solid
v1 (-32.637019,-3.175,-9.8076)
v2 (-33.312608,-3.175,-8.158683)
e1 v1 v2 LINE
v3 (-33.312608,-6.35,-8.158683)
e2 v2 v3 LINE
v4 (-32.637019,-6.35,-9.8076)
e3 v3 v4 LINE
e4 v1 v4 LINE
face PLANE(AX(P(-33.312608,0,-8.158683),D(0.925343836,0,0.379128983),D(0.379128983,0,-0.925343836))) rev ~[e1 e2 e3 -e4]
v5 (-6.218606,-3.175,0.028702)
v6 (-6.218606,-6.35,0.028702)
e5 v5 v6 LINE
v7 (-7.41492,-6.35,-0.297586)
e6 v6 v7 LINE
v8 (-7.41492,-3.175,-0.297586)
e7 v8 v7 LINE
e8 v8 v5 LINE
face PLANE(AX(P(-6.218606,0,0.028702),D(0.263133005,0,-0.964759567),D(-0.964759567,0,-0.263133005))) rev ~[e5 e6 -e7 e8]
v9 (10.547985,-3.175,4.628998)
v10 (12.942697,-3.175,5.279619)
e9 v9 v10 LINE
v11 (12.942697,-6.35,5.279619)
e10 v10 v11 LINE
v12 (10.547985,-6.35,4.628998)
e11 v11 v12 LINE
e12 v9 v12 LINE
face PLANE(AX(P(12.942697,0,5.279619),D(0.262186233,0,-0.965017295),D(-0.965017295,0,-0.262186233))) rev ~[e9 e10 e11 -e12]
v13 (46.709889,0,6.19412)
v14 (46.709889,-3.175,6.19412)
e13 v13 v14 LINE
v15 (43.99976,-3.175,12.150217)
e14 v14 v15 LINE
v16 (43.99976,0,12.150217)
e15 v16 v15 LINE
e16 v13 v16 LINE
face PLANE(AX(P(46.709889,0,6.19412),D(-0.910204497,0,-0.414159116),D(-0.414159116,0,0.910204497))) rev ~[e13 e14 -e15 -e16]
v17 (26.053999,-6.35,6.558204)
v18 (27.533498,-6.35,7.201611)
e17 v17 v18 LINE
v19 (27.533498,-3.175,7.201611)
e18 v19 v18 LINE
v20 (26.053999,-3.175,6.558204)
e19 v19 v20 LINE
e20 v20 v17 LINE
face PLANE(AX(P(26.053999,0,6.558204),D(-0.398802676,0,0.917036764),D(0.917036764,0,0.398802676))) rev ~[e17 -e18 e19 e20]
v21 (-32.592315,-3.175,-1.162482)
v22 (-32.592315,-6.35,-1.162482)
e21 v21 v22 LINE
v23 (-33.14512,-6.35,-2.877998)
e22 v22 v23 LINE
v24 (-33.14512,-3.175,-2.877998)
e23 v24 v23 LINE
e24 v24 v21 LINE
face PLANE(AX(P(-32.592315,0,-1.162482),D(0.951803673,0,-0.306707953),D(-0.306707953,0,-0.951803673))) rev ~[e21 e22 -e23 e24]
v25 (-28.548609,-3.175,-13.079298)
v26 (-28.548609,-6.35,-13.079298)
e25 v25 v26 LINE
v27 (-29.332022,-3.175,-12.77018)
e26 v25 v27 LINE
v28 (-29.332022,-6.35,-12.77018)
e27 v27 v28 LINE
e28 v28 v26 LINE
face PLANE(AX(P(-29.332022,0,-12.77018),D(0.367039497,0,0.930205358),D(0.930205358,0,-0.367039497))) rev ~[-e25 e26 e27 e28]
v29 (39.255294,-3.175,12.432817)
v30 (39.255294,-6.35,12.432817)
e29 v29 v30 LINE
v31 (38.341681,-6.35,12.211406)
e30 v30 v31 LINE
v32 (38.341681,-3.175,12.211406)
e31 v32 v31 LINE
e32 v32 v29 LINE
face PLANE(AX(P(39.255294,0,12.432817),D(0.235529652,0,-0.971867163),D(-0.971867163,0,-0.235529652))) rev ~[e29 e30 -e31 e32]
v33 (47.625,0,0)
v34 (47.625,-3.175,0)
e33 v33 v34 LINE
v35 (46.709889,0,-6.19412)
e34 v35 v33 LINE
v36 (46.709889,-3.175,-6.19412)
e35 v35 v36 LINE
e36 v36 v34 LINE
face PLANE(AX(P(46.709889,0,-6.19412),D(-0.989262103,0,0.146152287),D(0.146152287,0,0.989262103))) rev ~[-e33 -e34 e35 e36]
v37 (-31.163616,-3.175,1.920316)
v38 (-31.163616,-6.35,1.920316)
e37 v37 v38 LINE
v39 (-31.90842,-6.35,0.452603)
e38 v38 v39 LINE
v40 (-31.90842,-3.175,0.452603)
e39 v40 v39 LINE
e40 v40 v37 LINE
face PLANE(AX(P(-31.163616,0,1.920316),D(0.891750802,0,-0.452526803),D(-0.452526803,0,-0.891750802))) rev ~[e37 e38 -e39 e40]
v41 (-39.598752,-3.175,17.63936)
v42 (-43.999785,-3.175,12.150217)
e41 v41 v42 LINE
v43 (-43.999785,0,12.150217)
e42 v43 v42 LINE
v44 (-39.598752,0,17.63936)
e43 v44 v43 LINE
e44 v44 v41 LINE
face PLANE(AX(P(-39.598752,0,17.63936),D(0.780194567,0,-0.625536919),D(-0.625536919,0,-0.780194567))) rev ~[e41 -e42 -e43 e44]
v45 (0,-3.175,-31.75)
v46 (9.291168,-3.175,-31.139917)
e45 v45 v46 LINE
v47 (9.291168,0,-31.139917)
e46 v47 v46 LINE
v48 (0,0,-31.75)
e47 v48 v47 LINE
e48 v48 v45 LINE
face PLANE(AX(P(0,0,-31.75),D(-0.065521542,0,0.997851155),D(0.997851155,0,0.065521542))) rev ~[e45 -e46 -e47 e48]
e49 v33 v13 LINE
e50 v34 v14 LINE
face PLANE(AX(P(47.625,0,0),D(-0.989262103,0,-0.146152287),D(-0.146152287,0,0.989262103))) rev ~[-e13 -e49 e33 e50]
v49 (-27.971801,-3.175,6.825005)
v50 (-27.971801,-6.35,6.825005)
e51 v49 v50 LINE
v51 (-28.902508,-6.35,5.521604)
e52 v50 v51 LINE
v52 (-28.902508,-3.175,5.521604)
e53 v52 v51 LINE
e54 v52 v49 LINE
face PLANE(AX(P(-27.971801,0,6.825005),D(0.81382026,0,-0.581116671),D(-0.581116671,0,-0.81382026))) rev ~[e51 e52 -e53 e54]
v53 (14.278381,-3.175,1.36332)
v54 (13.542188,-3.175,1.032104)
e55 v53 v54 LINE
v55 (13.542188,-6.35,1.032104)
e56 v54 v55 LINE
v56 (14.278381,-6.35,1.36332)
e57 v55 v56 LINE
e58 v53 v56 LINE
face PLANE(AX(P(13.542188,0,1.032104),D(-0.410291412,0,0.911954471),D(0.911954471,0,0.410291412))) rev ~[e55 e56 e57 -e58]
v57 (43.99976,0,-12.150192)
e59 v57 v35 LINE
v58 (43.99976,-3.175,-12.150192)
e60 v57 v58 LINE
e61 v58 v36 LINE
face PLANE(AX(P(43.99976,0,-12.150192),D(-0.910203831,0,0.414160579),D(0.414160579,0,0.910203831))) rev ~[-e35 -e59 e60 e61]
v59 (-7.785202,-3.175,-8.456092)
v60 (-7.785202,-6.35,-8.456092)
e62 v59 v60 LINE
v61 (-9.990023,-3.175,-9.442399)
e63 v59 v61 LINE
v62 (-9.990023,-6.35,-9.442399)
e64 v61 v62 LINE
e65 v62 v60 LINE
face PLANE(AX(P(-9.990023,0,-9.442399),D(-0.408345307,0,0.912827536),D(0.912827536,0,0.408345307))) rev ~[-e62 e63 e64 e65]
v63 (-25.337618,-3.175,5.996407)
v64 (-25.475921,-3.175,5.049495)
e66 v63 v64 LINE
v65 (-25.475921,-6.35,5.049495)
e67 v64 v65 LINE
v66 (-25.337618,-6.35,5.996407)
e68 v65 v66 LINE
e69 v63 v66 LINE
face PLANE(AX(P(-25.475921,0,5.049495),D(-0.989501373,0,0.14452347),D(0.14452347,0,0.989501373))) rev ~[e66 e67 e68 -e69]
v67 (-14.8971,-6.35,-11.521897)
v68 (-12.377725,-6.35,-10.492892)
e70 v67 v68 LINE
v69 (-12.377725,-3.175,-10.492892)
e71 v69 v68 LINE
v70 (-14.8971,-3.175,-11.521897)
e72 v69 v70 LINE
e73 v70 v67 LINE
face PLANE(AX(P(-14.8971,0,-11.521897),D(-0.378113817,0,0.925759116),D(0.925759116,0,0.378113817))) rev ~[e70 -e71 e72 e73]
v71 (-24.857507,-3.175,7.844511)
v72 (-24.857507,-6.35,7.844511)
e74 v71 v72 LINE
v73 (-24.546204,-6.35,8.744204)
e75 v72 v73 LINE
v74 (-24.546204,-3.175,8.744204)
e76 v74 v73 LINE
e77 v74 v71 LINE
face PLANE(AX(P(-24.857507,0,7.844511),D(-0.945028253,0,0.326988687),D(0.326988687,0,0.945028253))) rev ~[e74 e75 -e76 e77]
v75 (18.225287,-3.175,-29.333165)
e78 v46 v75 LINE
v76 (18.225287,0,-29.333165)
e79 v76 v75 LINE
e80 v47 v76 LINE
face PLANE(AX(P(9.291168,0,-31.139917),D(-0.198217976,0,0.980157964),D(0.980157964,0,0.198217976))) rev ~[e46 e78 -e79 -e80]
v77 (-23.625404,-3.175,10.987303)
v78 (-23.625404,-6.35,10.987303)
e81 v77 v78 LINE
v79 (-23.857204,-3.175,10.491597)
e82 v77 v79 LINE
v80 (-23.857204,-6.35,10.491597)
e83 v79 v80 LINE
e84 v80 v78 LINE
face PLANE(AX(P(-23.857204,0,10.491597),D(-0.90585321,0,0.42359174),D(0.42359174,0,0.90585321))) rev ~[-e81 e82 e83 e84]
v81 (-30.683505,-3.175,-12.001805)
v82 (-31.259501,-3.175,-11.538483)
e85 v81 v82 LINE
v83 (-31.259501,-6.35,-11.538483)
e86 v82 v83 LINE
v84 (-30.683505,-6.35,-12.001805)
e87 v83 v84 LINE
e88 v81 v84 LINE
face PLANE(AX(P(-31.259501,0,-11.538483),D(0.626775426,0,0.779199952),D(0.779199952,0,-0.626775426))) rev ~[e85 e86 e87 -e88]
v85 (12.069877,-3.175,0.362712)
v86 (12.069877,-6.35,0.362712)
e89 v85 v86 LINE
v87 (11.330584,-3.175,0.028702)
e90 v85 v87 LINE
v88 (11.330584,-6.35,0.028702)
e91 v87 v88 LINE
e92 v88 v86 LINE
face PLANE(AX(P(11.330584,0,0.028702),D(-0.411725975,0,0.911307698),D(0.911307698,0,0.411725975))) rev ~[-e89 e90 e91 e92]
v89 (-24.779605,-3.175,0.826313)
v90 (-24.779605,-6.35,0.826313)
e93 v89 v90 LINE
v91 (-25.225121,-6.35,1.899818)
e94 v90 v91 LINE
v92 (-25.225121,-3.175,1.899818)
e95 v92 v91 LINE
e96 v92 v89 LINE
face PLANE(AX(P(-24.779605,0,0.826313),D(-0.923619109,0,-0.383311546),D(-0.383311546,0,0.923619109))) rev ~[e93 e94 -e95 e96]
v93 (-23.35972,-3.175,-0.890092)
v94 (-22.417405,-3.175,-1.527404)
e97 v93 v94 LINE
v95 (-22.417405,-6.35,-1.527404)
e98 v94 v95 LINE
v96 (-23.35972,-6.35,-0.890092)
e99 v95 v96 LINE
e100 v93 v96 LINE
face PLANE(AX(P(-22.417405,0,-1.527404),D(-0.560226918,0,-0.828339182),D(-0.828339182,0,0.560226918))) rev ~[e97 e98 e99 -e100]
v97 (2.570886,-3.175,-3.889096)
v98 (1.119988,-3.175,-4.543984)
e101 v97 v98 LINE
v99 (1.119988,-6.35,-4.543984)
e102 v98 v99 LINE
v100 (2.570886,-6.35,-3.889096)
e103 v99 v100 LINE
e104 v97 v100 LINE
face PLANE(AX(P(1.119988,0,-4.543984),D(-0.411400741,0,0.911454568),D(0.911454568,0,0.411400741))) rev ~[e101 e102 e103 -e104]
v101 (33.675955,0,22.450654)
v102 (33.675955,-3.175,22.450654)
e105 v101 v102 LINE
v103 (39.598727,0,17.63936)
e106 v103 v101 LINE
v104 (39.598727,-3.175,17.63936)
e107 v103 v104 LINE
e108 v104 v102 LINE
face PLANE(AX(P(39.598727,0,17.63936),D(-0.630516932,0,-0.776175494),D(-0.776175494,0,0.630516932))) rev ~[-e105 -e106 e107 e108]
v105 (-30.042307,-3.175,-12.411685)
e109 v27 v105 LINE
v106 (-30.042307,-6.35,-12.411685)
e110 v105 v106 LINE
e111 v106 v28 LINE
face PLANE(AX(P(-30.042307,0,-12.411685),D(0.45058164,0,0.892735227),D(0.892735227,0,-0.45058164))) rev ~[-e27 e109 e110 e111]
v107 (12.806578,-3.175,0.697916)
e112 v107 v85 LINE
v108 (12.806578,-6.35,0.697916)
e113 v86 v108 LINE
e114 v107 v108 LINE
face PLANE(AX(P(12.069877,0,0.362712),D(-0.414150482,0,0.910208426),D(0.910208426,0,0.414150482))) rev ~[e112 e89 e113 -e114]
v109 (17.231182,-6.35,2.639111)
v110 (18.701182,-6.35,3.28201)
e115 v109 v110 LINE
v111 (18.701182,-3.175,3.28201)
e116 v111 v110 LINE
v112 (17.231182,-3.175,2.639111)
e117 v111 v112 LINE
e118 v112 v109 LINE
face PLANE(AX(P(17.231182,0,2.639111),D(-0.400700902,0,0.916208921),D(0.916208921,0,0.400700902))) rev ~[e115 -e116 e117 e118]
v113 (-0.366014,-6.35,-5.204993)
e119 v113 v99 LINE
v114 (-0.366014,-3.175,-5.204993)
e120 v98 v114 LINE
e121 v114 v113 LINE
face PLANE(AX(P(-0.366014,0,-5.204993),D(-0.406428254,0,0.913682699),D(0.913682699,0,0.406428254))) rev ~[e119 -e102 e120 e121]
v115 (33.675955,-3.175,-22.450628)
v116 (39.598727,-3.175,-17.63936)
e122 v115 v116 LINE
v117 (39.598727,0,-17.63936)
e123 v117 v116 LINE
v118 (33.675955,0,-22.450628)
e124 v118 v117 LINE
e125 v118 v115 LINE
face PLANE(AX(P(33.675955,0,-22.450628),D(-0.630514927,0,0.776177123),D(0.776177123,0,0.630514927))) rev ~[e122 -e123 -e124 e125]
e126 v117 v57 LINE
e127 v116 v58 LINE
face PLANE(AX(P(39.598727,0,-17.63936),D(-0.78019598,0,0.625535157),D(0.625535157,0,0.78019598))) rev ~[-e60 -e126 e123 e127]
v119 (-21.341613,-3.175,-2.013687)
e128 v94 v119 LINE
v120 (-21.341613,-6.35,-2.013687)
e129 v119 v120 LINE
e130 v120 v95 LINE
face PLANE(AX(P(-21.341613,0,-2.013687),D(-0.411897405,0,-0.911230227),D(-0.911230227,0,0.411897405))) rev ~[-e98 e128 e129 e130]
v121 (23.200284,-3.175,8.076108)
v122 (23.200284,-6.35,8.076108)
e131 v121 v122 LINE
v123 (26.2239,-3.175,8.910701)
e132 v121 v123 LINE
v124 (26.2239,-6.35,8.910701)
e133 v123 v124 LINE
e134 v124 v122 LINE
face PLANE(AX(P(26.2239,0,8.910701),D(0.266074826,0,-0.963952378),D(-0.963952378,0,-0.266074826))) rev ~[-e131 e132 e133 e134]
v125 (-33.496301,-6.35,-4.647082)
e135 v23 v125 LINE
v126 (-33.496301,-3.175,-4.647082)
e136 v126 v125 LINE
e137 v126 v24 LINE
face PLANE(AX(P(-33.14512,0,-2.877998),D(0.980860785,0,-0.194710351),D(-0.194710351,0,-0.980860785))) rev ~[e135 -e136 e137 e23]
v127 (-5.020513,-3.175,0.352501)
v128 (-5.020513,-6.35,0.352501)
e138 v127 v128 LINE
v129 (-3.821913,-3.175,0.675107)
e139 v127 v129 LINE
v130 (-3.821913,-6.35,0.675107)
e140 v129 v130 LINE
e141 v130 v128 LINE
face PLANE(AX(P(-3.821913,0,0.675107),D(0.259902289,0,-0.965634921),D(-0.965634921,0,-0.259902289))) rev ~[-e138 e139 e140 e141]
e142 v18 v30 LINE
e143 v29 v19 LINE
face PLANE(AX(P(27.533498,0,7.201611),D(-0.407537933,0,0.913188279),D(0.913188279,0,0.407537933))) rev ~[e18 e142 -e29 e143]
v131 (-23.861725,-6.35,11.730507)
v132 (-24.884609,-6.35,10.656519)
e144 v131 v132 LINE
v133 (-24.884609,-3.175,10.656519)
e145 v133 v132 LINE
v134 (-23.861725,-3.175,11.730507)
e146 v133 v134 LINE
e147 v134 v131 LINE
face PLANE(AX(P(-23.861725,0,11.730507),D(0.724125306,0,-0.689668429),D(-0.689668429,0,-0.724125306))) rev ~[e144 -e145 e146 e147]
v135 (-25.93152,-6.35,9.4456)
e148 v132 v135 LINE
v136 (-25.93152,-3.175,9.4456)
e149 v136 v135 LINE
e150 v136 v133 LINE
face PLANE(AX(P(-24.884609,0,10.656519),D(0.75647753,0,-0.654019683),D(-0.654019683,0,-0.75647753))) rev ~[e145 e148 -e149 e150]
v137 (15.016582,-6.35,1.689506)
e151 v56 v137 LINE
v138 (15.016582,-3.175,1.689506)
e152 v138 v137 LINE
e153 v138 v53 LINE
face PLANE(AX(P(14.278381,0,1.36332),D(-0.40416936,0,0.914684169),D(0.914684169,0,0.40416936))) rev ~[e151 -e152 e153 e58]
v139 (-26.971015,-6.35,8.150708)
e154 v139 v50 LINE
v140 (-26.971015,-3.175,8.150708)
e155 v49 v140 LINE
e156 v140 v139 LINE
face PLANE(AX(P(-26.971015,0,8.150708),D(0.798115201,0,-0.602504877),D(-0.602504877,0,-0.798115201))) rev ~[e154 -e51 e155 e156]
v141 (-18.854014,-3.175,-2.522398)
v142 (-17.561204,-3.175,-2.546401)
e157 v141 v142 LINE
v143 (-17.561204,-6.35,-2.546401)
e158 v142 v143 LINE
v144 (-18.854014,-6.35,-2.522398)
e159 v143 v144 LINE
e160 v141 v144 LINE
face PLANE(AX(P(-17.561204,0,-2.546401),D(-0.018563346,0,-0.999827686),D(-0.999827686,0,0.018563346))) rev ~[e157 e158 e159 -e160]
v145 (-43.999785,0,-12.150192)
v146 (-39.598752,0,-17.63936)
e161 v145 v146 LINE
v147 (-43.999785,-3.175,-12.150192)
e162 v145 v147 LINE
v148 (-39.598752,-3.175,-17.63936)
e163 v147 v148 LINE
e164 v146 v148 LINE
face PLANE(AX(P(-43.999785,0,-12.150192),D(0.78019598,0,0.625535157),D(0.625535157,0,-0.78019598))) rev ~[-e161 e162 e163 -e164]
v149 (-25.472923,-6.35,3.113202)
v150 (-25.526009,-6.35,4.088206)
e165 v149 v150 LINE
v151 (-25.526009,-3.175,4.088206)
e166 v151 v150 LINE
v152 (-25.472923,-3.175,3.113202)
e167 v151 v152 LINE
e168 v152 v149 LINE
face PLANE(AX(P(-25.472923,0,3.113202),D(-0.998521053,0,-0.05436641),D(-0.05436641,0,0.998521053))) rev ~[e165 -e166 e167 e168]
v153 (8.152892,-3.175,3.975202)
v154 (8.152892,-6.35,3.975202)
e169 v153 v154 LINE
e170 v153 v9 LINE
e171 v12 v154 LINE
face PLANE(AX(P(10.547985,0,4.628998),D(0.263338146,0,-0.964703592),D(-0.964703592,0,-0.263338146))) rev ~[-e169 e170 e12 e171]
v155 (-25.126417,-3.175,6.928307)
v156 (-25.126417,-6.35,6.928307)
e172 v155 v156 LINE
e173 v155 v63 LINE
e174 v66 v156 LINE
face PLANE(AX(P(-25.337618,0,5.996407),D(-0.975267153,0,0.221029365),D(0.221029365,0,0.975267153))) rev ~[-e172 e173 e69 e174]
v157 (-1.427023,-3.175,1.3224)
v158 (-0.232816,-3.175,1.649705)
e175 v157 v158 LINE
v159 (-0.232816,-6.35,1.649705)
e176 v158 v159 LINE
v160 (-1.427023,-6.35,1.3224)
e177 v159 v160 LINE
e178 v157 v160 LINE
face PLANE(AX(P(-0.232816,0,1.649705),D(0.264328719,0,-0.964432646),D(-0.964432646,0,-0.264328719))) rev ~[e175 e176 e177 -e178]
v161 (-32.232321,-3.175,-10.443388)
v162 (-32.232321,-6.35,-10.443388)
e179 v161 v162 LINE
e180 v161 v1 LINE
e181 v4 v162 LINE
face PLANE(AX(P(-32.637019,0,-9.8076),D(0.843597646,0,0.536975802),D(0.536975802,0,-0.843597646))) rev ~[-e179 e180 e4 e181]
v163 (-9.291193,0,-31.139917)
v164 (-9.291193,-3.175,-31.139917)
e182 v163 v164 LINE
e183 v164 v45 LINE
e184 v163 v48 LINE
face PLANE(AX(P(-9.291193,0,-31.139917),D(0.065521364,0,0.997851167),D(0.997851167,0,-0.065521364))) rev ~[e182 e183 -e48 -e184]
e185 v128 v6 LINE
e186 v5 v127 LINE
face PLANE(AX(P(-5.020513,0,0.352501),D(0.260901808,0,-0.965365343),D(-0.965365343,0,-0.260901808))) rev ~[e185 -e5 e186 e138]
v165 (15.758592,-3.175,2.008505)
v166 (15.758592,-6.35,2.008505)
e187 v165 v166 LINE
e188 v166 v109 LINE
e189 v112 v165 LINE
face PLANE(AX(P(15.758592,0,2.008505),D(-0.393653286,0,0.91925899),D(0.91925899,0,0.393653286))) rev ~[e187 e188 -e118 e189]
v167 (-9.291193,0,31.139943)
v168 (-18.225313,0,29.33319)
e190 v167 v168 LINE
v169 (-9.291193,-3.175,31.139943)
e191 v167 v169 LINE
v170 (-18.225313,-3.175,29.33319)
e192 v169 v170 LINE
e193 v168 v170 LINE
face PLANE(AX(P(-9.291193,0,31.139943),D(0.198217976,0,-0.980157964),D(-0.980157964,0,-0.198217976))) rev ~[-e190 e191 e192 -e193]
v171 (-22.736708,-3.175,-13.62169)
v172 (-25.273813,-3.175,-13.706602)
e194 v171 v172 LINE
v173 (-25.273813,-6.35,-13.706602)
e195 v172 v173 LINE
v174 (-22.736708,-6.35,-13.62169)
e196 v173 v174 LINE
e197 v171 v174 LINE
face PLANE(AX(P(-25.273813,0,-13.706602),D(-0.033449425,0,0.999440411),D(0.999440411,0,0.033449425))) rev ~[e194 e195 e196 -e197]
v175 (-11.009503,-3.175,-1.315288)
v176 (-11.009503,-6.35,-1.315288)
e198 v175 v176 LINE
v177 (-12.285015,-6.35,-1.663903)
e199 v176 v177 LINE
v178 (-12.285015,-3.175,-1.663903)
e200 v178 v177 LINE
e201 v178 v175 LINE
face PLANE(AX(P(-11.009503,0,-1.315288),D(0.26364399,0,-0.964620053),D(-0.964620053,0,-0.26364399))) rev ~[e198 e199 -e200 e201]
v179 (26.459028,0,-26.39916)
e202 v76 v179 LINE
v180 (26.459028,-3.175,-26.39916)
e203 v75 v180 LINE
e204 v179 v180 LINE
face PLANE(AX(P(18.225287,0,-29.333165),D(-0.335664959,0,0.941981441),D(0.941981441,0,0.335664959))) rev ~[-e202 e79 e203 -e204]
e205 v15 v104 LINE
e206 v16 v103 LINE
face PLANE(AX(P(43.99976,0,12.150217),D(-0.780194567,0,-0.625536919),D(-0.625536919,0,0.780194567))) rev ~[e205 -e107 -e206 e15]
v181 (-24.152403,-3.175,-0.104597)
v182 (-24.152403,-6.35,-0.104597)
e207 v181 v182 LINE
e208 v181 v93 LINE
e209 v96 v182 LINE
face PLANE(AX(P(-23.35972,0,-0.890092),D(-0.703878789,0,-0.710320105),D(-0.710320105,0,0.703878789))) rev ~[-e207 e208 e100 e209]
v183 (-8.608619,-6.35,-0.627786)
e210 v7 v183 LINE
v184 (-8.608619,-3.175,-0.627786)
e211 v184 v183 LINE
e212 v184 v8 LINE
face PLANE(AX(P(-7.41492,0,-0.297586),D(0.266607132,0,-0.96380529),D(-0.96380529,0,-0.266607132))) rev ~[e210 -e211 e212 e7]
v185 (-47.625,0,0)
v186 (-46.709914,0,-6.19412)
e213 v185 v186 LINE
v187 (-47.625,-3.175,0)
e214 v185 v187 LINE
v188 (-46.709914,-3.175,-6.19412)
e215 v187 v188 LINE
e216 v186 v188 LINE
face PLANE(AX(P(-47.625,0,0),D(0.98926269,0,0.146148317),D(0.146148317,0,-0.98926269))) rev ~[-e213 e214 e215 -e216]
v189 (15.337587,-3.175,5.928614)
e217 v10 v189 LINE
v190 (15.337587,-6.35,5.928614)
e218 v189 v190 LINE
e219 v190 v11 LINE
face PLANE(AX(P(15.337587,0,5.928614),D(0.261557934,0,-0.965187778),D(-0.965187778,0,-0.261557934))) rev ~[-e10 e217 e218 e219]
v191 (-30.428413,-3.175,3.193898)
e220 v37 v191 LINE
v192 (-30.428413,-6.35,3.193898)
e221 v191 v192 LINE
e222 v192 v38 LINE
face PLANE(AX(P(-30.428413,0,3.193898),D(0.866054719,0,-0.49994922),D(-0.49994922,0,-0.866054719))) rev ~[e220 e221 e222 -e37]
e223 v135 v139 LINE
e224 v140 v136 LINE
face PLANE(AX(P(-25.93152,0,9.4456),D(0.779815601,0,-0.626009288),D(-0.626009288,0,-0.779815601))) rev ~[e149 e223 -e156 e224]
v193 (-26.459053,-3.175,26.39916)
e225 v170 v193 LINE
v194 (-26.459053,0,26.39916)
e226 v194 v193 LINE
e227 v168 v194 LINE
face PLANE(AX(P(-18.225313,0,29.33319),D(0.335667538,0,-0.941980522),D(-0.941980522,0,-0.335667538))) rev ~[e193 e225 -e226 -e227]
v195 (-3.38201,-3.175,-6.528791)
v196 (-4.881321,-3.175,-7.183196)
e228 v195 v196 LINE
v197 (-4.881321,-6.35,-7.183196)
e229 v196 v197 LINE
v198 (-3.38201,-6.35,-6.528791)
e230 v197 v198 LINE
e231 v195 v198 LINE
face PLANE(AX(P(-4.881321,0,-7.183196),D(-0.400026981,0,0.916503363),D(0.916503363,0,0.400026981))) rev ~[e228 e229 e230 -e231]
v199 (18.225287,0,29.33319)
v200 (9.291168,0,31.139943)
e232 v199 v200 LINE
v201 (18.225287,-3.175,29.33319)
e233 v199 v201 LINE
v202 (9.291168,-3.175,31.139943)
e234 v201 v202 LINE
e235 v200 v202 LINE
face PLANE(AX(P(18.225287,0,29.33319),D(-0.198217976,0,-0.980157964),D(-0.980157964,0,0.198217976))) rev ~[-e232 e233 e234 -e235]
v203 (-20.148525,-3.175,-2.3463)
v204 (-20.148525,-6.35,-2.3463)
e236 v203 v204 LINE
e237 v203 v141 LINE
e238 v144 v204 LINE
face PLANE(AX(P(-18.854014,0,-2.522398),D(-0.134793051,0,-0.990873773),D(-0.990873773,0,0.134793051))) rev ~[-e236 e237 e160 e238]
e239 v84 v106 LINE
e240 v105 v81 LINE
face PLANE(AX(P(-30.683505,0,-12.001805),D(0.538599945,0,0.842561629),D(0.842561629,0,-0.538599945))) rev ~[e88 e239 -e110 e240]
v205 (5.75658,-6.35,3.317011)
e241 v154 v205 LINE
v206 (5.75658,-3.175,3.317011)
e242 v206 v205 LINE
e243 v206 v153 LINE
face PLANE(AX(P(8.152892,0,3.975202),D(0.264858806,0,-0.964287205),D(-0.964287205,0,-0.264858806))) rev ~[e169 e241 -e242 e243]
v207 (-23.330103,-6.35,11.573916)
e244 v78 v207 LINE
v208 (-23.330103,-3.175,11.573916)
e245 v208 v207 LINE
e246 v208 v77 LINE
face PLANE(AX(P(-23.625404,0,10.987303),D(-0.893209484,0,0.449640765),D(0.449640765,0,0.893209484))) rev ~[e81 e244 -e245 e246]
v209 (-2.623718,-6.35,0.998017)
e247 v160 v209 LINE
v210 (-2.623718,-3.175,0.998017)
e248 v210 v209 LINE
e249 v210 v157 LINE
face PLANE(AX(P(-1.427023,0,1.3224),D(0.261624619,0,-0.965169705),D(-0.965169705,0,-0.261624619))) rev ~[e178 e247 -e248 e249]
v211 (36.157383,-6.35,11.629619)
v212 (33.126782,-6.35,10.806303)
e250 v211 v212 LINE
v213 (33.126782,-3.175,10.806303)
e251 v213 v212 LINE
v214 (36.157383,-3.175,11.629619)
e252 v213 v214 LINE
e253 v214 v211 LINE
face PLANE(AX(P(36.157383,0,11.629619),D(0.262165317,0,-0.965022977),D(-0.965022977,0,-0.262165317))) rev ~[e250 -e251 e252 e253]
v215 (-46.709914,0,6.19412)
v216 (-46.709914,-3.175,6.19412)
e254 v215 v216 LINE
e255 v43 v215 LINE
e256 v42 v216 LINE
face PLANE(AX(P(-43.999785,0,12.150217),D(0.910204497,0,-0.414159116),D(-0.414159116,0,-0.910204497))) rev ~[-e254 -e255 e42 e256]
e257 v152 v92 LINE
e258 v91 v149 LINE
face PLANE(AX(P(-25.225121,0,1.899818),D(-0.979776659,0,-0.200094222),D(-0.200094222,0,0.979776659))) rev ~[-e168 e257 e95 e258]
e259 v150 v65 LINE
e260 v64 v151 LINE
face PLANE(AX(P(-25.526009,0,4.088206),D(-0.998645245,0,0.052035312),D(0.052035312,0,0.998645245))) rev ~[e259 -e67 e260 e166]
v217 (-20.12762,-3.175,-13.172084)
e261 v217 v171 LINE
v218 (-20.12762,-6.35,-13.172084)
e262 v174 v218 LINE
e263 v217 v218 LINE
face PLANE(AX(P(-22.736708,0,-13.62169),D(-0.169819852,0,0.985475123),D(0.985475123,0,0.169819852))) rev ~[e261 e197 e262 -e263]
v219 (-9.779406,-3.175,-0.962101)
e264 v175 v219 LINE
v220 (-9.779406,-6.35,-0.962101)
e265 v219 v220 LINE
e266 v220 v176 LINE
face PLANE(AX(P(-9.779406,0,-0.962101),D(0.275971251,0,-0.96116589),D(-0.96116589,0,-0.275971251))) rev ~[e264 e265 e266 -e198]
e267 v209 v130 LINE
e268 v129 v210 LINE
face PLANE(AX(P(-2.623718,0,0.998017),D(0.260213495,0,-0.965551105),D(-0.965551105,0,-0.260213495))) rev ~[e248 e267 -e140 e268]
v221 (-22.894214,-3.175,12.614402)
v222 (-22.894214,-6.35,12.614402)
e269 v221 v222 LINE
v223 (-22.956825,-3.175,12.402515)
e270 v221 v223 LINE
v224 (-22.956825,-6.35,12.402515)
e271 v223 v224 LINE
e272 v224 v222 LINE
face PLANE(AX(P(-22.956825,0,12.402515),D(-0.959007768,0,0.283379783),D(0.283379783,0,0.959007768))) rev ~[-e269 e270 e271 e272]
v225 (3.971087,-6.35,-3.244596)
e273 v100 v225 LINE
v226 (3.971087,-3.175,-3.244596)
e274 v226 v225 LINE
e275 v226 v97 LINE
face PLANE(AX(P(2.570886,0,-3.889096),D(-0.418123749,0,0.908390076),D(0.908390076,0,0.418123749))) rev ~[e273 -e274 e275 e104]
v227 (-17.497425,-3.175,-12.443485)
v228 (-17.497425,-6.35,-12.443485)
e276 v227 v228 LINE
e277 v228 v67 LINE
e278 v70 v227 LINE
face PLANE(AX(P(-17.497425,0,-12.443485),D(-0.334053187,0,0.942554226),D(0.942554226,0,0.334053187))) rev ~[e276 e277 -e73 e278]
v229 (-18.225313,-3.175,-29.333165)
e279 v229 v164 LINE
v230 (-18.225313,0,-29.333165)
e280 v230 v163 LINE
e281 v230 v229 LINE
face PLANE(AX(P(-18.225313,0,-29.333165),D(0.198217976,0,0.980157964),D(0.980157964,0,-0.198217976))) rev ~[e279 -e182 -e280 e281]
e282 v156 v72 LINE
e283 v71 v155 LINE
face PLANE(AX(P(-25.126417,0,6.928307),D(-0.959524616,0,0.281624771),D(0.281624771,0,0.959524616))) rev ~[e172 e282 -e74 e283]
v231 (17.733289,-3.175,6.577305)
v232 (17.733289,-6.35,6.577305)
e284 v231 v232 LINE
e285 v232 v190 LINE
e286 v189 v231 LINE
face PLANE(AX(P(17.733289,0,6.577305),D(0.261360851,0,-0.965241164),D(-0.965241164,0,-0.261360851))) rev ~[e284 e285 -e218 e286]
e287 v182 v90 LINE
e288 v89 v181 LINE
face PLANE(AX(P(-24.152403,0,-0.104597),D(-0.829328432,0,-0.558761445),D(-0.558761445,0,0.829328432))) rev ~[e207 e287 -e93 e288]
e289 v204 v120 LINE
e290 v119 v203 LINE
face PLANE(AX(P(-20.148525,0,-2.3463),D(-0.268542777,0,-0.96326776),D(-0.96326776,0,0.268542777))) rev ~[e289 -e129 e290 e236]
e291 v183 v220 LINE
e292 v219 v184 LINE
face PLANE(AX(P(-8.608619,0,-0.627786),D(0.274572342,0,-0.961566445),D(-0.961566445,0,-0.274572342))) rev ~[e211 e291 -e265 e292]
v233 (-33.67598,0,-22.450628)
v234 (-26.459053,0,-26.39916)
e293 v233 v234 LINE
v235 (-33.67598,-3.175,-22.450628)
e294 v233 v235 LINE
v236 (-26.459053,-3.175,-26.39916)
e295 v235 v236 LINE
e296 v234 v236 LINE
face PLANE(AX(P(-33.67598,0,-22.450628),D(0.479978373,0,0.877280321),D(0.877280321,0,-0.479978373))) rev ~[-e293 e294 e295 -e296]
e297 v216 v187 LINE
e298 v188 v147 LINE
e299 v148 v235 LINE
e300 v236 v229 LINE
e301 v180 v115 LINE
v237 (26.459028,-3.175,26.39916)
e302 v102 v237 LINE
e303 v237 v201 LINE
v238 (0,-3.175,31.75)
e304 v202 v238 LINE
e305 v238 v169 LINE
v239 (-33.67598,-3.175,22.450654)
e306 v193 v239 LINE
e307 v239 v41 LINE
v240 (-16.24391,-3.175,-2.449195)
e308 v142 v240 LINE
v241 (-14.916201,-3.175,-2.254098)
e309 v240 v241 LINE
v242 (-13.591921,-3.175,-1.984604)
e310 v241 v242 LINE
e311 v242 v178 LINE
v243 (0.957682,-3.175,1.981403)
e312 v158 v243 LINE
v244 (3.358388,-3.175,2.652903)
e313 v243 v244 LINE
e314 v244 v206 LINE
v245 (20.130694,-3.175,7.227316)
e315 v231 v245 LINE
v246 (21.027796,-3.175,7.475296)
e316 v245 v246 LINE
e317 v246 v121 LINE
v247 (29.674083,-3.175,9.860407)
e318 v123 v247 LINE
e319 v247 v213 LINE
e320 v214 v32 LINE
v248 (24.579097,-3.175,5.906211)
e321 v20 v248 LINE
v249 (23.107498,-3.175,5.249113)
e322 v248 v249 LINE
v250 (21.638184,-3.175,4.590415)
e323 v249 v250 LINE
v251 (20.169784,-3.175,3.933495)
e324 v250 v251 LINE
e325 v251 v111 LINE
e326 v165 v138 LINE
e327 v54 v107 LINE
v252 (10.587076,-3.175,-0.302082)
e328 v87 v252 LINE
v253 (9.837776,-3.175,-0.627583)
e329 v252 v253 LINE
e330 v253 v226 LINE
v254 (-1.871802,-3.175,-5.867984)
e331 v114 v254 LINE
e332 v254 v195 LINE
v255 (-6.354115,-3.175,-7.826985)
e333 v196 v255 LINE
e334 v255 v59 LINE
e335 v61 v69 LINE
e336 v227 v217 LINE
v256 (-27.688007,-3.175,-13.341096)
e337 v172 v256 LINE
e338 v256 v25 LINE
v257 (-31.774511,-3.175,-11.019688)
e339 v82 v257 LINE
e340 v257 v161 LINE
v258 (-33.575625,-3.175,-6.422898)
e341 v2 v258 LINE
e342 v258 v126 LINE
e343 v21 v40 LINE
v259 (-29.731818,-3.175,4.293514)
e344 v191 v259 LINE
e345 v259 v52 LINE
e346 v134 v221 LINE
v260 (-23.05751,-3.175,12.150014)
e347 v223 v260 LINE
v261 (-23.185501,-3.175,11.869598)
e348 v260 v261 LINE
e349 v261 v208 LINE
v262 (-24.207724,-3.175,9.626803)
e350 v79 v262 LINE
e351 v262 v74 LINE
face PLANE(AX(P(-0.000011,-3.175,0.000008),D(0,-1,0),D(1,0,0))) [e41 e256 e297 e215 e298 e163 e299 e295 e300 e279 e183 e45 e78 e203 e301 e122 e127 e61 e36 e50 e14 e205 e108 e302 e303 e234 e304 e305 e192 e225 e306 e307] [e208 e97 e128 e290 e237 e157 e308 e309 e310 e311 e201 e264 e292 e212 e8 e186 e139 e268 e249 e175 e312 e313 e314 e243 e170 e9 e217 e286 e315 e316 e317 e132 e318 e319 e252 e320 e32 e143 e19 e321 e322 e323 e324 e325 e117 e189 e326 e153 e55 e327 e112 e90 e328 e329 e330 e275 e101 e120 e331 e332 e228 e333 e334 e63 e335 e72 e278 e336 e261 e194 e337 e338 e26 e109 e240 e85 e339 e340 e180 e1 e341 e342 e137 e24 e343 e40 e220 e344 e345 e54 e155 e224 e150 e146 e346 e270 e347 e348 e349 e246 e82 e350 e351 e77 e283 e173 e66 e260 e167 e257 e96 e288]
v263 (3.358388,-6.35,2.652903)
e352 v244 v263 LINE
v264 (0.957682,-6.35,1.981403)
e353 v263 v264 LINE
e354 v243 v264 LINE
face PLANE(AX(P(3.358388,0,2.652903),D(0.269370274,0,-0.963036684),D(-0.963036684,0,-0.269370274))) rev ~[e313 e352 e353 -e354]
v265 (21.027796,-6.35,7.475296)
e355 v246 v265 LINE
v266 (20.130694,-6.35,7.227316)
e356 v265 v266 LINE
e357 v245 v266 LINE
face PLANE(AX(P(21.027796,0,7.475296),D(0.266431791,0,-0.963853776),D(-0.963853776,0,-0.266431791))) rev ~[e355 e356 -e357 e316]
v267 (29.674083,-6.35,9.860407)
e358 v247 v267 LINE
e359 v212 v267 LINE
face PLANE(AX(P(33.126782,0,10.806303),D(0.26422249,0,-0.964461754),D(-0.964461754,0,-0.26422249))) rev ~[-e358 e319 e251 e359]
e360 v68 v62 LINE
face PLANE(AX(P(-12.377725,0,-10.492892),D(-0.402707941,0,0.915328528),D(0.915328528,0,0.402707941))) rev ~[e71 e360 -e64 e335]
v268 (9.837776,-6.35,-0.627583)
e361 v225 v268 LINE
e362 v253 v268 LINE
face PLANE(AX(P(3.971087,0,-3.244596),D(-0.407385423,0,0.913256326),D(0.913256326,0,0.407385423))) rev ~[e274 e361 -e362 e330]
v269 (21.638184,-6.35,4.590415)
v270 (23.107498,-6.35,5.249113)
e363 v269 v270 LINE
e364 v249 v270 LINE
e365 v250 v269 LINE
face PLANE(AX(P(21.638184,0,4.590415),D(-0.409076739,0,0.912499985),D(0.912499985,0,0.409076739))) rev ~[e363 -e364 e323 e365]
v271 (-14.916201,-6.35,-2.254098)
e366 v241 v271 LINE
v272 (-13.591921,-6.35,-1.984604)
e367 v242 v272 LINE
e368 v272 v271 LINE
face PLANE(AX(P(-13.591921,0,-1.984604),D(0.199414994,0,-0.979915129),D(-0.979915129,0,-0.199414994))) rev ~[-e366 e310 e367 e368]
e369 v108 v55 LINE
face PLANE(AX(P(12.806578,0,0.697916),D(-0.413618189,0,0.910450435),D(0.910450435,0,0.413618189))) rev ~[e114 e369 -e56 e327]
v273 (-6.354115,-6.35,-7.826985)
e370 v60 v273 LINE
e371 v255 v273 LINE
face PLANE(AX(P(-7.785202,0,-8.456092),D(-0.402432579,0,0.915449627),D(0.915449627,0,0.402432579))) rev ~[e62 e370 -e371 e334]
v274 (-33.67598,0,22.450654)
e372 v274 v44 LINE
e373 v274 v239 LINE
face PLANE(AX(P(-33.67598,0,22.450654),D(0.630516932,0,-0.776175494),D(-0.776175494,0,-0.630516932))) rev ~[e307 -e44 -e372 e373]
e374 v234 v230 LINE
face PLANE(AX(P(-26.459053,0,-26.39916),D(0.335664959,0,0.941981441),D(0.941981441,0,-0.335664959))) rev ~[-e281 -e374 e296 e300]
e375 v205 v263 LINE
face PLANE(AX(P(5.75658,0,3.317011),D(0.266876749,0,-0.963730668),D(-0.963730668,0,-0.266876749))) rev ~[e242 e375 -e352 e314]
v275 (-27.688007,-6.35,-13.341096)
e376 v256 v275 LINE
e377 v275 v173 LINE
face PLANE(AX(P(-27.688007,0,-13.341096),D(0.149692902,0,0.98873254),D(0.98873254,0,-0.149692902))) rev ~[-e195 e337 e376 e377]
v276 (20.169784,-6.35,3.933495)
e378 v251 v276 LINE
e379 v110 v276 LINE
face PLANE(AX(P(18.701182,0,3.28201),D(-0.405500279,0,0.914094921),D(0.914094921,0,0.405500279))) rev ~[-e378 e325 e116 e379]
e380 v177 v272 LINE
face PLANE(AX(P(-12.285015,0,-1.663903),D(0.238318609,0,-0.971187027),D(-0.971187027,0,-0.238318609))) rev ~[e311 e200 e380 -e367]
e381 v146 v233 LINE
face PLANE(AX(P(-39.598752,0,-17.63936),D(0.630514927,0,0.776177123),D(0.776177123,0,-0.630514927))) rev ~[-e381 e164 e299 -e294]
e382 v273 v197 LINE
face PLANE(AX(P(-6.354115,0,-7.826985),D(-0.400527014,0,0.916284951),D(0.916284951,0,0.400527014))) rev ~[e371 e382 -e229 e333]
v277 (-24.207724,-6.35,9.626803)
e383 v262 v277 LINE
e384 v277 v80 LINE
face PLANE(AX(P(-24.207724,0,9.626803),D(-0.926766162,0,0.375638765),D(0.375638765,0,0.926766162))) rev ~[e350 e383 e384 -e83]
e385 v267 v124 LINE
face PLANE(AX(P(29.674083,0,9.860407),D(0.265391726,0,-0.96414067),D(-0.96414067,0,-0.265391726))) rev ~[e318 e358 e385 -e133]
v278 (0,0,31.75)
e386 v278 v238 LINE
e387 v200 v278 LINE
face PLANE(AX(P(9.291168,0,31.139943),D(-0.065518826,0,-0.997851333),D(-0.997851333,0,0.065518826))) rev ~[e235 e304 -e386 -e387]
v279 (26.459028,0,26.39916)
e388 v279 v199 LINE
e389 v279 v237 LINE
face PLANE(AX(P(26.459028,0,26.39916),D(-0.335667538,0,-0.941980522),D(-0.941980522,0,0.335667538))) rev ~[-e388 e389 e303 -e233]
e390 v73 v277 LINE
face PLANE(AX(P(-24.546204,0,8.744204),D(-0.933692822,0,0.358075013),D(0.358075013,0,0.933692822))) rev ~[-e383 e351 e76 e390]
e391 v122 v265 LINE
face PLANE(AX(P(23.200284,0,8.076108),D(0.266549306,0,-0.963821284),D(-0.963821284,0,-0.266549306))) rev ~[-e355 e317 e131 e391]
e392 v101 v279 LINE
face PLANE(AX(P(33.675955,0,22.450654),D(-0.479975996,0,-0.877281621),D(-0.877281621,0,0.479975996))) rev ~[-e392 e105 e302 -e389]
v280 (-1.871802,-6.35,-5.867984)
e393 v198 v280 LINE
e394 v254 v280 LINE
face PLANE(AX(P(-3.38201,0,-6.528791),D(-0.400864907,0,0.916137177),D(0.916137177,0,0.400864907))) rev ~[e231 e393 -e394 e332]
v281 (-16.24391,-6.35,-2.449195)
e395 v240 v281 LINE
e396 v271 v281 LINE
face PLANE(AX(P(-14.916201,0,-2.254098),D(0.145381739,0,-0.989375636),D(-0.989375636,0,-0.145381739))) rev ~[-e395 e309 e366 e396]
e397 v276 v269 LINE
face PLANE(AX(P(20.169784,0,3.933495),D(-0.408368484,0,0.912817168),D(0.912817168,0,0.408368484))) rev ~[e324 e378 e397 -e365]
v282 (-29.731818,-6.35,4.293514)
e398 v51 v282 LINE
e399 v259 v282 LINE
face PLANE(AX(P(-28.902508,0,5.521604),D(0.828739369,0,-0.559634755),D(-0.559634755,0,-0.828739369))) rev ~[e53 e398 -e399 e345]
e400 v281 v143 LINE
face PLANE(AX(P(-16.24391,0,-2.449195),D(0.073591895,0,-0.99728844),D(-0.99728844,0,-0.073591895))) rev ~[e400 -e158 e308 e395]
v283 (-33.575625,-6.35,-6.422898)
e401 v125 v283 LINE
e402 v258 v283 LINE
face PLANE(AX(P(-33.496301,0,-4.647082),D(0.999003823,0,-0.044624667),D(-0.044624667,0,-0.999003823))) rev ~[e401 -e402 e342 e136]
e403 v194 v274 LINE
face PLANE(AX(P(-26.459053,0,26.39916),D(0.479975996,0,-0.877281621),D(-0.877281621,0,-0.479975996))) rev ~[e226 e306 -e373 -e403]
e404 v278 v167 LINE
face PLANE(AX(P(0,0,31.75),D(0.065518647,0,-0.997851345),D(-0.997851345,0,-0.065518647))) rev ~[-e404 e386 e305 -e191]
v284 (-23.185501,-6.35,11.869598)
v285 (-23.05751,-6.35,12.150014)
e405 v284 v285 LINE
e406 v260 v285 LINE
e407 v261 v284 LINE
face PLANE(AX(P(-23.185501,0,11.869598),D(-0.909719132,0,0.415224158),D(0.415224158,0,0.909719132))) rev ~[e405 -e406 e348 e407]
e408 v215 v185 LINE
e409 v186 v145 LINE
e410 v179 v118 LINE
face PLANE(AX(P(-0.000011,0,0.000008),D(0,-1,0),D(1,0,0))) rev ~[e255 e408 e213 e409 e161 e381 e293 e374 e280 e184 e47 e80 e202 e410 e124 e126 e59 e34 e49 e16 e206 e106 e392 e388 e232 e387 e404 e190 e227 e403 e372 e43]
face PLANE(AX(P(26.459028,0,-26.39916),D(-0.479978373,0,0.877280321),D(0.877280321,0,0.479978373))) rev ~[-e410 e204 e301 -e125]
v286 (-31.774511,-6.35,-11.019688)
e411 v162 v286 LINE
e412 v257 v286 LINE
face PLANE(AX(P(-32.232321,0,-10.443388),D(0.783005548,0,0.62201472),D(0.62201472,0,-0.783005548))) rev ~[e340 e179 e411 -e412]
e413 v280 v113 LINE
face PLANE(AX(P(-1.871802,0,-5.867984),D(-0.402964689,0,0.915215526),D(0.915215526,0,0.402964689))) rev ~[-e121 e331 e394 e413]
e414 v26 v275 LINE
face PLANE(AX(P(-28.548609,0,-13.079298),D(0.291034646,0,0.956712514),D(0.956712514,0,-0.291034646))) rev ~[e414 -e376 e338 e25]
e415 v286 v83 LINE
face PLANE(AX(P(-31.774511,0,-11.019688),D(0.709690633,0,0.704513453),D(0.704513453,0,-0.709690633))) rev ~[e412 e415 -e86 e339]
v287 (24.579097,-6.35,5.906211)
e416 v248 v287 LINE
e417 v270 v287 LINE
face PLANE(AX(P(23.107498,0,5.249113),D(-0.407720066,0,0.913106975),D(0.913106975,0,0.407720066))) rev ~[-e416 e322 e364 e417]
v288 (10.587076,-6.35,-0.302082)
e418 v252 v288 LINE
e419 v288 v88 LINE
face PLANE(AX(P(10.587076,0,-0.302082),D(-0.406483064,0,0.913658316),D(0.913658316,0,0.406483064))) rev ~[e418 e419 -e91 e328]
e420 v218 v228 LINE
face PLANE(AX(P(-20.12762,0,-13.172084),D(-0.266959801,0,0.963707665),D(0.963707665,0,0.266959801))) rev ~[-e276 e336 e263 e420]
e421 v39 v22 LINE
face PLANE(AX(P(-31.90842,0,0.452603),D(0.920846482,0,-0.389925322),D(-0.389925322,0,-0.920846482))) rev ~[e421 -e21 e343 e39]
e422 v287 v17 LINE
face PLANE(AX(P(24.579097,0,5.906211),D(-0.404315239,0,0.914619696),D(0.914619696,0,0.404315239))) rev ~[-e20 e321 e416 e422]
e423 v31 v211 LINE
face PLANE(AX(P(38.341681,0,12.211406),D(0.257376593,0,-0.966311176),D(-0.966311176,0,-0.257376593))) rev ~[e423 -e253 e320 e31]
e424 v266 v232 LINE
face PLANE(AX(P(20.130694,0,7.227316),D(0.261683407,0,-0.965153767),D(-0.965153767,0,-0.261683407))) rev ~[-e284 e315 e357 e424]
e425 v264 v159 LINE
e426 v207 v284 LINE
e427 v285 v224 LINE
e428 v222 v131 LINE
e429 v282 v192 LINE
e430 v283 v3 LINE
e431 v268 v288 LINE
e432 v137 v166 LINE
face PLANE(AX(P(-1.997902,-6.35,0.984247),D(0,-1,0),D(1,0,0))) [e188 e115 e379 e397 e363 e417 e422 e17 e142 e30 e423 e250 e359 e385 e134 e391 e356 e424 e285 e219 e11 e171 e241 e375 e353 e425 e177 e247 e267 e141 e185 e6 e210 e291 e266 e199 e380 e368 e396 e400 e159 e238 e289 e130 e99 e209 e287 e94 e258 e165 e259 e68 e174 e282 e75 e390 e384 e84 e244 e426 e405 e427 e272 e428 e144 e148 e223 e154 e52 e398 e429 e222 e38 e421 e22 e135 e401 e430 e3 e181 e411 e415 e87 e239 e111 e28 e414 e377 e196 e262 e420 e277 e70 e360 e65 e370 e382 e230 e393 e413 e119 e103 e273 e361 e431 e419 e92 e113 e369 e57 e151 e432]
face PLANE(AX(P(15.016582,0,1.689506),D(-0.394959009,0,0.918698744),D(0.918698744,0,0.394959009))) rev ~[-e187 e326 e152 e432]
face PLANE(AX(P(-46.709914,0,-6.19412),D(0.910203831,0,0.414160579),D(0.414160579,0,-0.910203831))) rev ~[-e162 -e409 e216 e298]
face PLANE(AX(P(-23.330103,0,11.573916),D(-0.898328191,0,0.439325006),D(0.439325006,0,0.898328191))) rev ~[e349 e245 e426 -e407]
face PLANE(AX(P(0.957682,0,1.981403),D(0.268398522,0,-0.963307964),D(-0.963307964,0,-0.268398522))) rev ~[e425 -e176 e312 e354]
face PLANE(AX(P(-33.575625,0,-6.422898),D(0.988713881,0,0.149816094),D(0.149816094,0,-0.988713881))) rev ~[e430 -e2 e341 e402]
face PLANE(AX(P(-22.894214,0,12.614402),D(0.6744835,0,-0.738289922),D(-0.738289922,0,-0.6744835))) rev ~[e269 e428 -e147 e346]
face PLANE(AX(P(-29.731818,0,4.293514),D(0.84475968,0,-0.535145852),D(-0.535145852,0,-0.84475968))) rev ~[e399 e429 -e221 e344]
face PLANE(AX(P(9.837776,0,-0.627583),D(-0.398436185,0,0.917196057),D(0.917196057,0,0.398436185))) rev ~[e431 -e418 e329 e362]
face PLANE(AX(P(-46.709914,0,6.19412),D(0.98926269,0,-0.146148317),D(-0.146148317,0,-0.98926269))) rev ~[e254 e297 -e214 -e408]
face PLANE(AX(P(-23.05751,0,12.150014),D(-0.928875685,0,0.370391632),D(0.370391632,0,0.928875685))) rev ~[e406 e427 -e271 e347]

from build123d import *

# Parameters (mm, degrees)
F1_DEPTH = 3.175
F2_DEPTH = 6.35


# Not quite as in the source:
# - a length typed as a fraction of an inch, garbled in the dataset ("3 / 203.2 mm" for 3/8 in), is restored


with BuildPart() as f1:
    # F0 (on Front) → F1 (new body)
    with BuildSketch(Plane.XZ):
        Polygon((46.7098888, -6.1941202), (47.625, 0), (46.7098888, 6.1941202), (43.9997596, 12.150217), (39.598727, 17.6393602), (33.675955, 22.4506536), (26.4590276, 26.3991598), (18.2252874, 29.33319), (9.2911676, 31.1399428), (0, 31.75), (-9.291193, 31.1399428), (-18.2253128, 29.33319), (-26.459053, 26.3991598), (-33.6759804, 22.4506536), (-39.5987524, 17.6393602), (-43.999785, 12.150217), (-46.7099142, 6.1941202), (-47.625, 0), (-46.7099142, -6.1941202), (-43.999785, -12.1501916), (-39.5987524, -17.6393602), (-33.6759804, -22.4506282), (-26.459053, -26.3991598), (-18.2253128, -29.3331646), (-9.291193, -31.1399174), (0, -31.75), (9.2911676, -31.1399174), (18.2252874, -29.3331646), (26.4590276, -26.3991598), (33.675955, -22.4506282), (39.598727, -17.6393602), (43.9997596, -12.1501916), align=None)
        Polygon((38.341681, 12.2114056), (39.2552936, 12.4328174), (27.5334984, 7.2016112), (26.0539992, 6.5582038), (24.5790974, 5.9062112), (23.1074976, 5.2491132), (21.6381838, 4.590415), (20.1697844, 3.9334948), (18.7011818, 3.2820102), (17.2311822, 2.6391108), (15.7585918, 2.008505), (15.0165816, 1.6895064), (14.2783814, 1.3633196), (13.5421878, 1.0321036), (12.8065784, 0.6979158), (12.0698768, 0.362712), (11.3305844, 0.028702), (10.5870756, -0.3020822), (9.8377756, -0.6275832), (3.9710868, -3.244596), (2.5708864, -3.8890956), (1.1199876, -4.5439838), (-0.366014, -5.2049934), (-1.8718022, -5.8679842), (-3.38201, -6.5287906), (-4.8813212, -7.1831962), (-6.3541148, -7.8269846), (-7.7852016, -8.4560918), (-9.9900232, -9.4423992), (-12.3777248, -10.4928924), (-14.8971, -11.5218972), (-17.497425, -12.4434854), (-20.1276204, -13.1720844), (-22.7367084, -13.6216898), (-25.2738128, -13.706602), (-27.6880066, -13.341096), (-28.5486094, -13.0792982), (-29.3320216, -12.7701802), (-30.0423072, -12.4116846), (-30.6835048, -12.0018048), (-31.2595006, -11.5384834), (-31.774511, -11.0196884), (-32.2323206, -10.4433878), (-32.6370188, -9.8076004), (-33.312608, -8.1586832), (-33.575625, -6.422898), (-33.4963008, -4.6470824), (-33.1451204, -2.8779978), (-32.5923148, -1.1624818), (-31.9084198, 0.4526026), (-31.1636156, 1.9203162), (-30.4284126, 3.1938976), (-29.7318176, 4.2935144), (-28.9025076, 5.5216044), (-27.9718008, 6.8250054), (-26.9710154, 8.1507076), (-25.9315204, 9.4455996), (-24.8846086, 10.6565192), (-23.8617252, 11.7305074), (-22.8942138, 12.614402), (-22.9568248, 12.4025152), (-23.0575104, 12.1500138), (-23.185501, 11.8695978), (-23.3301032, 11.5739164), (-23.6254036, 10.9873034), (-23.857204, 10.491597), (-24.207724, 9.6268032), (-24.5462044, 8.744204), (-24.8575068, 7.8445106), (-25.1264166, 6.9283072), (-25.3376176, 5.9964066), (-25.4759206, 5.0494946), (-25.5260094, 4.0882062), (-25.4729234, 3.1132018), (-25.225121, 1.8998184), (-24.779605, 0.8263128), (-24.1524028, -0.1045972), (-23.3597196, -0.8900922), (-22.417405, -1.5274036), (-21.3416134, -2.0136866), (-20.1485246, -2.3462996), (-18.8540136, -2.5223978), (-17.5612044, -2.5464008), (-16.2439096, -2.449195), (-14.9162008, -2.2540976), (-13.591921, -1.9846036), (-12.2850148, -1.6639032), (-11.009503, -1.3152882), (-9.7794064, -0.9621012), (-8.6086188, -0.6277864), (-7.4149204, -0.2975864), (-6.2186058, 0.028702), (-5.0205132, 0.3525012), (-3.8219126, 0.6751066), (-2.6237184, 0.9980168), (-1.4270228, 1.3224002), (-0.2328164, 1.6497046), (0.9576816, 1.9814032), (3.358388, 2.652903), (5.7565798, 3.3170114), (8.152892, 3.9752016), (10.547985, 4.6289976), (12.942697, 5.2796186), (15.3375868, 5.928614), (17.7332894, 6.5773046), (20.1306938, 7.227316), (21.0277964, 7.4752962), (23.2002838, 8.0761078), (26.2238998, 8.910701), (29.6740834, 9.860407), (33.1267816, 10.806303), (36.1573826, 11.6296186), align=None, mode=Mode.SUBTRACT)
    extrude(amount=F1_DEPTH)

    # F0 (on Front) → F2 (join)
    with BuildSketch(Plane.XZ):
        Polygon((27.5334984, 7.2016112), (39.2552936, 12.4328174), (38.341681, 12.2114056), (36.1573826, 11.6296186), (33.1267816, 10.806303), (29.6740834, 9.860407), (26.2238998, 8.910701), (23.2002838, 8.0761078), (21.0277964, 7.4752962), (20.1306938, 7.227316), (17.7332894, 6.5773046), (15.3375868, 5.928614), (12.942697, 5.2796186), (10.547985, 4.6289976), (8.152892, 3.9752016), (5.7565798, 3.3170114), (3.358388, 2.652903), (0.9576816, 1.9814032), (-0.2328164, 1.6497046), (-1.4270228, 1.3224002), (-2.6237184, 0.9980168), (-3.8219126, 0.6751066), (-5.0205132, 0.3525012), (-6.2186058, 0.028702), (-7.4149204, -0.2975864), (-8.6086188, -0.6277864), (-9.7794064, -0.9621012), (-11.009503, -1.3152882), (-12.2850148, -1.6639032), (-13.591921, -1.9846036), (-14.9162008, -2.2540976), (-16.2439096, -2.449195), (-17.5612044, -2.5464008), (-18.8540136, -2.5223978), (-20.1485246, -2.3462996), (-21.3416134, -2.0136866), (-22.417405, -1.5274036), (-23.3597196, -0.8900922), (-24.1524028, -0.1045972), (-24.779605, 0.8263128), (-25.225121, 1.8998184), (-25.4729234, 3.1132018), (-25.5260094, 4.0882062), (-25.4759206, 5.0494946), (-25.3376176, 5.9964066), (-25.1264166, 6.9283072), (-24.8575068, 7.8445106), (-24.5462044, 8.744204), (-24.207724, 9.6268032), (-23.857204, 10.491597), (-23.6254036, 10.9873034), (-23.3301032, 11.5739164), (-23.185501, 11.8695978), (-23.0575104, 12.1500138), (-22.9568248, 12.4025152), (-22.8942138, 12.614402), (-23.8617252, 11.7305074), (-24.8846086, 10.6565192), (-25.9315204, 9.4455996), (-26.9710154, 8.1507076), (-27.9718008, 6.8250054), (-28.9025076, 5.5216044), (-29.7318176, 4.2935144), (-30.4284126, 3.1938976), (-31.1636156, 1.9203162), (-31.9084198, 0.4526026), (-32.5923148, -1.1624818), (-33.1451204, -2.8779978), (-33.4963008, -4.6470824), (-33.575625, -6.422898), (-33.312608, -8.1586832), (-32.6370188, -9.8076004), (-32.2323206, -10.4433878), (-31.774511, -11.0196884), (-31.2595006, -11.5384834), (-30.6835048, -12.0018048), (-30.0423072, -12.4116846), (-29.3320216, -12.7701802), (-28.5486094, -13.0792982), (-27.6880066, -13.341096), (-25.2738128, -13.706602), (-22.7367084, -13.6216898), (-20.1276204, -13.1720844), (-17.497425, -12.4434854), (-14.8971, -11.5218972), (-12.3777248, -10.4928924), (-9.9900232, -9.4423992), (-7.7852016, -8.4560918), (-6.3541148, -7.8269846), (-4.8813212, -7.1831962), (-3.38201, -6.5287906), (-1.8718022, -5.8679842), (-0.366014, -5.2049934), (1.1199876, -4.5439838), (2.5708864, -3.8890956), (3.9710868, -3.244596), (9.8377756, -0.6275832), (10.5870756, -0.3020822), (11.3305844, 0.028702), (12.0698768, 0.362712), (12.8065784, 0.6979158), (13.5421878, 1.0321036), (14.2783814, 1.3633196), (15.0165816, 1.6895064), (15.7585918, 2.008505), (17.2311822, 2.6391108), (18.7011818, 3.2820102), (20.1697844, 3.9334948), (21.6381838, 4.590415), (23.1074976, 5.2491132), (24.5790974, 5.9062112), (26.0539992, 6.5582038), align=None)
    extrude(amount=F2_DEPTH)


solid = f1.part
